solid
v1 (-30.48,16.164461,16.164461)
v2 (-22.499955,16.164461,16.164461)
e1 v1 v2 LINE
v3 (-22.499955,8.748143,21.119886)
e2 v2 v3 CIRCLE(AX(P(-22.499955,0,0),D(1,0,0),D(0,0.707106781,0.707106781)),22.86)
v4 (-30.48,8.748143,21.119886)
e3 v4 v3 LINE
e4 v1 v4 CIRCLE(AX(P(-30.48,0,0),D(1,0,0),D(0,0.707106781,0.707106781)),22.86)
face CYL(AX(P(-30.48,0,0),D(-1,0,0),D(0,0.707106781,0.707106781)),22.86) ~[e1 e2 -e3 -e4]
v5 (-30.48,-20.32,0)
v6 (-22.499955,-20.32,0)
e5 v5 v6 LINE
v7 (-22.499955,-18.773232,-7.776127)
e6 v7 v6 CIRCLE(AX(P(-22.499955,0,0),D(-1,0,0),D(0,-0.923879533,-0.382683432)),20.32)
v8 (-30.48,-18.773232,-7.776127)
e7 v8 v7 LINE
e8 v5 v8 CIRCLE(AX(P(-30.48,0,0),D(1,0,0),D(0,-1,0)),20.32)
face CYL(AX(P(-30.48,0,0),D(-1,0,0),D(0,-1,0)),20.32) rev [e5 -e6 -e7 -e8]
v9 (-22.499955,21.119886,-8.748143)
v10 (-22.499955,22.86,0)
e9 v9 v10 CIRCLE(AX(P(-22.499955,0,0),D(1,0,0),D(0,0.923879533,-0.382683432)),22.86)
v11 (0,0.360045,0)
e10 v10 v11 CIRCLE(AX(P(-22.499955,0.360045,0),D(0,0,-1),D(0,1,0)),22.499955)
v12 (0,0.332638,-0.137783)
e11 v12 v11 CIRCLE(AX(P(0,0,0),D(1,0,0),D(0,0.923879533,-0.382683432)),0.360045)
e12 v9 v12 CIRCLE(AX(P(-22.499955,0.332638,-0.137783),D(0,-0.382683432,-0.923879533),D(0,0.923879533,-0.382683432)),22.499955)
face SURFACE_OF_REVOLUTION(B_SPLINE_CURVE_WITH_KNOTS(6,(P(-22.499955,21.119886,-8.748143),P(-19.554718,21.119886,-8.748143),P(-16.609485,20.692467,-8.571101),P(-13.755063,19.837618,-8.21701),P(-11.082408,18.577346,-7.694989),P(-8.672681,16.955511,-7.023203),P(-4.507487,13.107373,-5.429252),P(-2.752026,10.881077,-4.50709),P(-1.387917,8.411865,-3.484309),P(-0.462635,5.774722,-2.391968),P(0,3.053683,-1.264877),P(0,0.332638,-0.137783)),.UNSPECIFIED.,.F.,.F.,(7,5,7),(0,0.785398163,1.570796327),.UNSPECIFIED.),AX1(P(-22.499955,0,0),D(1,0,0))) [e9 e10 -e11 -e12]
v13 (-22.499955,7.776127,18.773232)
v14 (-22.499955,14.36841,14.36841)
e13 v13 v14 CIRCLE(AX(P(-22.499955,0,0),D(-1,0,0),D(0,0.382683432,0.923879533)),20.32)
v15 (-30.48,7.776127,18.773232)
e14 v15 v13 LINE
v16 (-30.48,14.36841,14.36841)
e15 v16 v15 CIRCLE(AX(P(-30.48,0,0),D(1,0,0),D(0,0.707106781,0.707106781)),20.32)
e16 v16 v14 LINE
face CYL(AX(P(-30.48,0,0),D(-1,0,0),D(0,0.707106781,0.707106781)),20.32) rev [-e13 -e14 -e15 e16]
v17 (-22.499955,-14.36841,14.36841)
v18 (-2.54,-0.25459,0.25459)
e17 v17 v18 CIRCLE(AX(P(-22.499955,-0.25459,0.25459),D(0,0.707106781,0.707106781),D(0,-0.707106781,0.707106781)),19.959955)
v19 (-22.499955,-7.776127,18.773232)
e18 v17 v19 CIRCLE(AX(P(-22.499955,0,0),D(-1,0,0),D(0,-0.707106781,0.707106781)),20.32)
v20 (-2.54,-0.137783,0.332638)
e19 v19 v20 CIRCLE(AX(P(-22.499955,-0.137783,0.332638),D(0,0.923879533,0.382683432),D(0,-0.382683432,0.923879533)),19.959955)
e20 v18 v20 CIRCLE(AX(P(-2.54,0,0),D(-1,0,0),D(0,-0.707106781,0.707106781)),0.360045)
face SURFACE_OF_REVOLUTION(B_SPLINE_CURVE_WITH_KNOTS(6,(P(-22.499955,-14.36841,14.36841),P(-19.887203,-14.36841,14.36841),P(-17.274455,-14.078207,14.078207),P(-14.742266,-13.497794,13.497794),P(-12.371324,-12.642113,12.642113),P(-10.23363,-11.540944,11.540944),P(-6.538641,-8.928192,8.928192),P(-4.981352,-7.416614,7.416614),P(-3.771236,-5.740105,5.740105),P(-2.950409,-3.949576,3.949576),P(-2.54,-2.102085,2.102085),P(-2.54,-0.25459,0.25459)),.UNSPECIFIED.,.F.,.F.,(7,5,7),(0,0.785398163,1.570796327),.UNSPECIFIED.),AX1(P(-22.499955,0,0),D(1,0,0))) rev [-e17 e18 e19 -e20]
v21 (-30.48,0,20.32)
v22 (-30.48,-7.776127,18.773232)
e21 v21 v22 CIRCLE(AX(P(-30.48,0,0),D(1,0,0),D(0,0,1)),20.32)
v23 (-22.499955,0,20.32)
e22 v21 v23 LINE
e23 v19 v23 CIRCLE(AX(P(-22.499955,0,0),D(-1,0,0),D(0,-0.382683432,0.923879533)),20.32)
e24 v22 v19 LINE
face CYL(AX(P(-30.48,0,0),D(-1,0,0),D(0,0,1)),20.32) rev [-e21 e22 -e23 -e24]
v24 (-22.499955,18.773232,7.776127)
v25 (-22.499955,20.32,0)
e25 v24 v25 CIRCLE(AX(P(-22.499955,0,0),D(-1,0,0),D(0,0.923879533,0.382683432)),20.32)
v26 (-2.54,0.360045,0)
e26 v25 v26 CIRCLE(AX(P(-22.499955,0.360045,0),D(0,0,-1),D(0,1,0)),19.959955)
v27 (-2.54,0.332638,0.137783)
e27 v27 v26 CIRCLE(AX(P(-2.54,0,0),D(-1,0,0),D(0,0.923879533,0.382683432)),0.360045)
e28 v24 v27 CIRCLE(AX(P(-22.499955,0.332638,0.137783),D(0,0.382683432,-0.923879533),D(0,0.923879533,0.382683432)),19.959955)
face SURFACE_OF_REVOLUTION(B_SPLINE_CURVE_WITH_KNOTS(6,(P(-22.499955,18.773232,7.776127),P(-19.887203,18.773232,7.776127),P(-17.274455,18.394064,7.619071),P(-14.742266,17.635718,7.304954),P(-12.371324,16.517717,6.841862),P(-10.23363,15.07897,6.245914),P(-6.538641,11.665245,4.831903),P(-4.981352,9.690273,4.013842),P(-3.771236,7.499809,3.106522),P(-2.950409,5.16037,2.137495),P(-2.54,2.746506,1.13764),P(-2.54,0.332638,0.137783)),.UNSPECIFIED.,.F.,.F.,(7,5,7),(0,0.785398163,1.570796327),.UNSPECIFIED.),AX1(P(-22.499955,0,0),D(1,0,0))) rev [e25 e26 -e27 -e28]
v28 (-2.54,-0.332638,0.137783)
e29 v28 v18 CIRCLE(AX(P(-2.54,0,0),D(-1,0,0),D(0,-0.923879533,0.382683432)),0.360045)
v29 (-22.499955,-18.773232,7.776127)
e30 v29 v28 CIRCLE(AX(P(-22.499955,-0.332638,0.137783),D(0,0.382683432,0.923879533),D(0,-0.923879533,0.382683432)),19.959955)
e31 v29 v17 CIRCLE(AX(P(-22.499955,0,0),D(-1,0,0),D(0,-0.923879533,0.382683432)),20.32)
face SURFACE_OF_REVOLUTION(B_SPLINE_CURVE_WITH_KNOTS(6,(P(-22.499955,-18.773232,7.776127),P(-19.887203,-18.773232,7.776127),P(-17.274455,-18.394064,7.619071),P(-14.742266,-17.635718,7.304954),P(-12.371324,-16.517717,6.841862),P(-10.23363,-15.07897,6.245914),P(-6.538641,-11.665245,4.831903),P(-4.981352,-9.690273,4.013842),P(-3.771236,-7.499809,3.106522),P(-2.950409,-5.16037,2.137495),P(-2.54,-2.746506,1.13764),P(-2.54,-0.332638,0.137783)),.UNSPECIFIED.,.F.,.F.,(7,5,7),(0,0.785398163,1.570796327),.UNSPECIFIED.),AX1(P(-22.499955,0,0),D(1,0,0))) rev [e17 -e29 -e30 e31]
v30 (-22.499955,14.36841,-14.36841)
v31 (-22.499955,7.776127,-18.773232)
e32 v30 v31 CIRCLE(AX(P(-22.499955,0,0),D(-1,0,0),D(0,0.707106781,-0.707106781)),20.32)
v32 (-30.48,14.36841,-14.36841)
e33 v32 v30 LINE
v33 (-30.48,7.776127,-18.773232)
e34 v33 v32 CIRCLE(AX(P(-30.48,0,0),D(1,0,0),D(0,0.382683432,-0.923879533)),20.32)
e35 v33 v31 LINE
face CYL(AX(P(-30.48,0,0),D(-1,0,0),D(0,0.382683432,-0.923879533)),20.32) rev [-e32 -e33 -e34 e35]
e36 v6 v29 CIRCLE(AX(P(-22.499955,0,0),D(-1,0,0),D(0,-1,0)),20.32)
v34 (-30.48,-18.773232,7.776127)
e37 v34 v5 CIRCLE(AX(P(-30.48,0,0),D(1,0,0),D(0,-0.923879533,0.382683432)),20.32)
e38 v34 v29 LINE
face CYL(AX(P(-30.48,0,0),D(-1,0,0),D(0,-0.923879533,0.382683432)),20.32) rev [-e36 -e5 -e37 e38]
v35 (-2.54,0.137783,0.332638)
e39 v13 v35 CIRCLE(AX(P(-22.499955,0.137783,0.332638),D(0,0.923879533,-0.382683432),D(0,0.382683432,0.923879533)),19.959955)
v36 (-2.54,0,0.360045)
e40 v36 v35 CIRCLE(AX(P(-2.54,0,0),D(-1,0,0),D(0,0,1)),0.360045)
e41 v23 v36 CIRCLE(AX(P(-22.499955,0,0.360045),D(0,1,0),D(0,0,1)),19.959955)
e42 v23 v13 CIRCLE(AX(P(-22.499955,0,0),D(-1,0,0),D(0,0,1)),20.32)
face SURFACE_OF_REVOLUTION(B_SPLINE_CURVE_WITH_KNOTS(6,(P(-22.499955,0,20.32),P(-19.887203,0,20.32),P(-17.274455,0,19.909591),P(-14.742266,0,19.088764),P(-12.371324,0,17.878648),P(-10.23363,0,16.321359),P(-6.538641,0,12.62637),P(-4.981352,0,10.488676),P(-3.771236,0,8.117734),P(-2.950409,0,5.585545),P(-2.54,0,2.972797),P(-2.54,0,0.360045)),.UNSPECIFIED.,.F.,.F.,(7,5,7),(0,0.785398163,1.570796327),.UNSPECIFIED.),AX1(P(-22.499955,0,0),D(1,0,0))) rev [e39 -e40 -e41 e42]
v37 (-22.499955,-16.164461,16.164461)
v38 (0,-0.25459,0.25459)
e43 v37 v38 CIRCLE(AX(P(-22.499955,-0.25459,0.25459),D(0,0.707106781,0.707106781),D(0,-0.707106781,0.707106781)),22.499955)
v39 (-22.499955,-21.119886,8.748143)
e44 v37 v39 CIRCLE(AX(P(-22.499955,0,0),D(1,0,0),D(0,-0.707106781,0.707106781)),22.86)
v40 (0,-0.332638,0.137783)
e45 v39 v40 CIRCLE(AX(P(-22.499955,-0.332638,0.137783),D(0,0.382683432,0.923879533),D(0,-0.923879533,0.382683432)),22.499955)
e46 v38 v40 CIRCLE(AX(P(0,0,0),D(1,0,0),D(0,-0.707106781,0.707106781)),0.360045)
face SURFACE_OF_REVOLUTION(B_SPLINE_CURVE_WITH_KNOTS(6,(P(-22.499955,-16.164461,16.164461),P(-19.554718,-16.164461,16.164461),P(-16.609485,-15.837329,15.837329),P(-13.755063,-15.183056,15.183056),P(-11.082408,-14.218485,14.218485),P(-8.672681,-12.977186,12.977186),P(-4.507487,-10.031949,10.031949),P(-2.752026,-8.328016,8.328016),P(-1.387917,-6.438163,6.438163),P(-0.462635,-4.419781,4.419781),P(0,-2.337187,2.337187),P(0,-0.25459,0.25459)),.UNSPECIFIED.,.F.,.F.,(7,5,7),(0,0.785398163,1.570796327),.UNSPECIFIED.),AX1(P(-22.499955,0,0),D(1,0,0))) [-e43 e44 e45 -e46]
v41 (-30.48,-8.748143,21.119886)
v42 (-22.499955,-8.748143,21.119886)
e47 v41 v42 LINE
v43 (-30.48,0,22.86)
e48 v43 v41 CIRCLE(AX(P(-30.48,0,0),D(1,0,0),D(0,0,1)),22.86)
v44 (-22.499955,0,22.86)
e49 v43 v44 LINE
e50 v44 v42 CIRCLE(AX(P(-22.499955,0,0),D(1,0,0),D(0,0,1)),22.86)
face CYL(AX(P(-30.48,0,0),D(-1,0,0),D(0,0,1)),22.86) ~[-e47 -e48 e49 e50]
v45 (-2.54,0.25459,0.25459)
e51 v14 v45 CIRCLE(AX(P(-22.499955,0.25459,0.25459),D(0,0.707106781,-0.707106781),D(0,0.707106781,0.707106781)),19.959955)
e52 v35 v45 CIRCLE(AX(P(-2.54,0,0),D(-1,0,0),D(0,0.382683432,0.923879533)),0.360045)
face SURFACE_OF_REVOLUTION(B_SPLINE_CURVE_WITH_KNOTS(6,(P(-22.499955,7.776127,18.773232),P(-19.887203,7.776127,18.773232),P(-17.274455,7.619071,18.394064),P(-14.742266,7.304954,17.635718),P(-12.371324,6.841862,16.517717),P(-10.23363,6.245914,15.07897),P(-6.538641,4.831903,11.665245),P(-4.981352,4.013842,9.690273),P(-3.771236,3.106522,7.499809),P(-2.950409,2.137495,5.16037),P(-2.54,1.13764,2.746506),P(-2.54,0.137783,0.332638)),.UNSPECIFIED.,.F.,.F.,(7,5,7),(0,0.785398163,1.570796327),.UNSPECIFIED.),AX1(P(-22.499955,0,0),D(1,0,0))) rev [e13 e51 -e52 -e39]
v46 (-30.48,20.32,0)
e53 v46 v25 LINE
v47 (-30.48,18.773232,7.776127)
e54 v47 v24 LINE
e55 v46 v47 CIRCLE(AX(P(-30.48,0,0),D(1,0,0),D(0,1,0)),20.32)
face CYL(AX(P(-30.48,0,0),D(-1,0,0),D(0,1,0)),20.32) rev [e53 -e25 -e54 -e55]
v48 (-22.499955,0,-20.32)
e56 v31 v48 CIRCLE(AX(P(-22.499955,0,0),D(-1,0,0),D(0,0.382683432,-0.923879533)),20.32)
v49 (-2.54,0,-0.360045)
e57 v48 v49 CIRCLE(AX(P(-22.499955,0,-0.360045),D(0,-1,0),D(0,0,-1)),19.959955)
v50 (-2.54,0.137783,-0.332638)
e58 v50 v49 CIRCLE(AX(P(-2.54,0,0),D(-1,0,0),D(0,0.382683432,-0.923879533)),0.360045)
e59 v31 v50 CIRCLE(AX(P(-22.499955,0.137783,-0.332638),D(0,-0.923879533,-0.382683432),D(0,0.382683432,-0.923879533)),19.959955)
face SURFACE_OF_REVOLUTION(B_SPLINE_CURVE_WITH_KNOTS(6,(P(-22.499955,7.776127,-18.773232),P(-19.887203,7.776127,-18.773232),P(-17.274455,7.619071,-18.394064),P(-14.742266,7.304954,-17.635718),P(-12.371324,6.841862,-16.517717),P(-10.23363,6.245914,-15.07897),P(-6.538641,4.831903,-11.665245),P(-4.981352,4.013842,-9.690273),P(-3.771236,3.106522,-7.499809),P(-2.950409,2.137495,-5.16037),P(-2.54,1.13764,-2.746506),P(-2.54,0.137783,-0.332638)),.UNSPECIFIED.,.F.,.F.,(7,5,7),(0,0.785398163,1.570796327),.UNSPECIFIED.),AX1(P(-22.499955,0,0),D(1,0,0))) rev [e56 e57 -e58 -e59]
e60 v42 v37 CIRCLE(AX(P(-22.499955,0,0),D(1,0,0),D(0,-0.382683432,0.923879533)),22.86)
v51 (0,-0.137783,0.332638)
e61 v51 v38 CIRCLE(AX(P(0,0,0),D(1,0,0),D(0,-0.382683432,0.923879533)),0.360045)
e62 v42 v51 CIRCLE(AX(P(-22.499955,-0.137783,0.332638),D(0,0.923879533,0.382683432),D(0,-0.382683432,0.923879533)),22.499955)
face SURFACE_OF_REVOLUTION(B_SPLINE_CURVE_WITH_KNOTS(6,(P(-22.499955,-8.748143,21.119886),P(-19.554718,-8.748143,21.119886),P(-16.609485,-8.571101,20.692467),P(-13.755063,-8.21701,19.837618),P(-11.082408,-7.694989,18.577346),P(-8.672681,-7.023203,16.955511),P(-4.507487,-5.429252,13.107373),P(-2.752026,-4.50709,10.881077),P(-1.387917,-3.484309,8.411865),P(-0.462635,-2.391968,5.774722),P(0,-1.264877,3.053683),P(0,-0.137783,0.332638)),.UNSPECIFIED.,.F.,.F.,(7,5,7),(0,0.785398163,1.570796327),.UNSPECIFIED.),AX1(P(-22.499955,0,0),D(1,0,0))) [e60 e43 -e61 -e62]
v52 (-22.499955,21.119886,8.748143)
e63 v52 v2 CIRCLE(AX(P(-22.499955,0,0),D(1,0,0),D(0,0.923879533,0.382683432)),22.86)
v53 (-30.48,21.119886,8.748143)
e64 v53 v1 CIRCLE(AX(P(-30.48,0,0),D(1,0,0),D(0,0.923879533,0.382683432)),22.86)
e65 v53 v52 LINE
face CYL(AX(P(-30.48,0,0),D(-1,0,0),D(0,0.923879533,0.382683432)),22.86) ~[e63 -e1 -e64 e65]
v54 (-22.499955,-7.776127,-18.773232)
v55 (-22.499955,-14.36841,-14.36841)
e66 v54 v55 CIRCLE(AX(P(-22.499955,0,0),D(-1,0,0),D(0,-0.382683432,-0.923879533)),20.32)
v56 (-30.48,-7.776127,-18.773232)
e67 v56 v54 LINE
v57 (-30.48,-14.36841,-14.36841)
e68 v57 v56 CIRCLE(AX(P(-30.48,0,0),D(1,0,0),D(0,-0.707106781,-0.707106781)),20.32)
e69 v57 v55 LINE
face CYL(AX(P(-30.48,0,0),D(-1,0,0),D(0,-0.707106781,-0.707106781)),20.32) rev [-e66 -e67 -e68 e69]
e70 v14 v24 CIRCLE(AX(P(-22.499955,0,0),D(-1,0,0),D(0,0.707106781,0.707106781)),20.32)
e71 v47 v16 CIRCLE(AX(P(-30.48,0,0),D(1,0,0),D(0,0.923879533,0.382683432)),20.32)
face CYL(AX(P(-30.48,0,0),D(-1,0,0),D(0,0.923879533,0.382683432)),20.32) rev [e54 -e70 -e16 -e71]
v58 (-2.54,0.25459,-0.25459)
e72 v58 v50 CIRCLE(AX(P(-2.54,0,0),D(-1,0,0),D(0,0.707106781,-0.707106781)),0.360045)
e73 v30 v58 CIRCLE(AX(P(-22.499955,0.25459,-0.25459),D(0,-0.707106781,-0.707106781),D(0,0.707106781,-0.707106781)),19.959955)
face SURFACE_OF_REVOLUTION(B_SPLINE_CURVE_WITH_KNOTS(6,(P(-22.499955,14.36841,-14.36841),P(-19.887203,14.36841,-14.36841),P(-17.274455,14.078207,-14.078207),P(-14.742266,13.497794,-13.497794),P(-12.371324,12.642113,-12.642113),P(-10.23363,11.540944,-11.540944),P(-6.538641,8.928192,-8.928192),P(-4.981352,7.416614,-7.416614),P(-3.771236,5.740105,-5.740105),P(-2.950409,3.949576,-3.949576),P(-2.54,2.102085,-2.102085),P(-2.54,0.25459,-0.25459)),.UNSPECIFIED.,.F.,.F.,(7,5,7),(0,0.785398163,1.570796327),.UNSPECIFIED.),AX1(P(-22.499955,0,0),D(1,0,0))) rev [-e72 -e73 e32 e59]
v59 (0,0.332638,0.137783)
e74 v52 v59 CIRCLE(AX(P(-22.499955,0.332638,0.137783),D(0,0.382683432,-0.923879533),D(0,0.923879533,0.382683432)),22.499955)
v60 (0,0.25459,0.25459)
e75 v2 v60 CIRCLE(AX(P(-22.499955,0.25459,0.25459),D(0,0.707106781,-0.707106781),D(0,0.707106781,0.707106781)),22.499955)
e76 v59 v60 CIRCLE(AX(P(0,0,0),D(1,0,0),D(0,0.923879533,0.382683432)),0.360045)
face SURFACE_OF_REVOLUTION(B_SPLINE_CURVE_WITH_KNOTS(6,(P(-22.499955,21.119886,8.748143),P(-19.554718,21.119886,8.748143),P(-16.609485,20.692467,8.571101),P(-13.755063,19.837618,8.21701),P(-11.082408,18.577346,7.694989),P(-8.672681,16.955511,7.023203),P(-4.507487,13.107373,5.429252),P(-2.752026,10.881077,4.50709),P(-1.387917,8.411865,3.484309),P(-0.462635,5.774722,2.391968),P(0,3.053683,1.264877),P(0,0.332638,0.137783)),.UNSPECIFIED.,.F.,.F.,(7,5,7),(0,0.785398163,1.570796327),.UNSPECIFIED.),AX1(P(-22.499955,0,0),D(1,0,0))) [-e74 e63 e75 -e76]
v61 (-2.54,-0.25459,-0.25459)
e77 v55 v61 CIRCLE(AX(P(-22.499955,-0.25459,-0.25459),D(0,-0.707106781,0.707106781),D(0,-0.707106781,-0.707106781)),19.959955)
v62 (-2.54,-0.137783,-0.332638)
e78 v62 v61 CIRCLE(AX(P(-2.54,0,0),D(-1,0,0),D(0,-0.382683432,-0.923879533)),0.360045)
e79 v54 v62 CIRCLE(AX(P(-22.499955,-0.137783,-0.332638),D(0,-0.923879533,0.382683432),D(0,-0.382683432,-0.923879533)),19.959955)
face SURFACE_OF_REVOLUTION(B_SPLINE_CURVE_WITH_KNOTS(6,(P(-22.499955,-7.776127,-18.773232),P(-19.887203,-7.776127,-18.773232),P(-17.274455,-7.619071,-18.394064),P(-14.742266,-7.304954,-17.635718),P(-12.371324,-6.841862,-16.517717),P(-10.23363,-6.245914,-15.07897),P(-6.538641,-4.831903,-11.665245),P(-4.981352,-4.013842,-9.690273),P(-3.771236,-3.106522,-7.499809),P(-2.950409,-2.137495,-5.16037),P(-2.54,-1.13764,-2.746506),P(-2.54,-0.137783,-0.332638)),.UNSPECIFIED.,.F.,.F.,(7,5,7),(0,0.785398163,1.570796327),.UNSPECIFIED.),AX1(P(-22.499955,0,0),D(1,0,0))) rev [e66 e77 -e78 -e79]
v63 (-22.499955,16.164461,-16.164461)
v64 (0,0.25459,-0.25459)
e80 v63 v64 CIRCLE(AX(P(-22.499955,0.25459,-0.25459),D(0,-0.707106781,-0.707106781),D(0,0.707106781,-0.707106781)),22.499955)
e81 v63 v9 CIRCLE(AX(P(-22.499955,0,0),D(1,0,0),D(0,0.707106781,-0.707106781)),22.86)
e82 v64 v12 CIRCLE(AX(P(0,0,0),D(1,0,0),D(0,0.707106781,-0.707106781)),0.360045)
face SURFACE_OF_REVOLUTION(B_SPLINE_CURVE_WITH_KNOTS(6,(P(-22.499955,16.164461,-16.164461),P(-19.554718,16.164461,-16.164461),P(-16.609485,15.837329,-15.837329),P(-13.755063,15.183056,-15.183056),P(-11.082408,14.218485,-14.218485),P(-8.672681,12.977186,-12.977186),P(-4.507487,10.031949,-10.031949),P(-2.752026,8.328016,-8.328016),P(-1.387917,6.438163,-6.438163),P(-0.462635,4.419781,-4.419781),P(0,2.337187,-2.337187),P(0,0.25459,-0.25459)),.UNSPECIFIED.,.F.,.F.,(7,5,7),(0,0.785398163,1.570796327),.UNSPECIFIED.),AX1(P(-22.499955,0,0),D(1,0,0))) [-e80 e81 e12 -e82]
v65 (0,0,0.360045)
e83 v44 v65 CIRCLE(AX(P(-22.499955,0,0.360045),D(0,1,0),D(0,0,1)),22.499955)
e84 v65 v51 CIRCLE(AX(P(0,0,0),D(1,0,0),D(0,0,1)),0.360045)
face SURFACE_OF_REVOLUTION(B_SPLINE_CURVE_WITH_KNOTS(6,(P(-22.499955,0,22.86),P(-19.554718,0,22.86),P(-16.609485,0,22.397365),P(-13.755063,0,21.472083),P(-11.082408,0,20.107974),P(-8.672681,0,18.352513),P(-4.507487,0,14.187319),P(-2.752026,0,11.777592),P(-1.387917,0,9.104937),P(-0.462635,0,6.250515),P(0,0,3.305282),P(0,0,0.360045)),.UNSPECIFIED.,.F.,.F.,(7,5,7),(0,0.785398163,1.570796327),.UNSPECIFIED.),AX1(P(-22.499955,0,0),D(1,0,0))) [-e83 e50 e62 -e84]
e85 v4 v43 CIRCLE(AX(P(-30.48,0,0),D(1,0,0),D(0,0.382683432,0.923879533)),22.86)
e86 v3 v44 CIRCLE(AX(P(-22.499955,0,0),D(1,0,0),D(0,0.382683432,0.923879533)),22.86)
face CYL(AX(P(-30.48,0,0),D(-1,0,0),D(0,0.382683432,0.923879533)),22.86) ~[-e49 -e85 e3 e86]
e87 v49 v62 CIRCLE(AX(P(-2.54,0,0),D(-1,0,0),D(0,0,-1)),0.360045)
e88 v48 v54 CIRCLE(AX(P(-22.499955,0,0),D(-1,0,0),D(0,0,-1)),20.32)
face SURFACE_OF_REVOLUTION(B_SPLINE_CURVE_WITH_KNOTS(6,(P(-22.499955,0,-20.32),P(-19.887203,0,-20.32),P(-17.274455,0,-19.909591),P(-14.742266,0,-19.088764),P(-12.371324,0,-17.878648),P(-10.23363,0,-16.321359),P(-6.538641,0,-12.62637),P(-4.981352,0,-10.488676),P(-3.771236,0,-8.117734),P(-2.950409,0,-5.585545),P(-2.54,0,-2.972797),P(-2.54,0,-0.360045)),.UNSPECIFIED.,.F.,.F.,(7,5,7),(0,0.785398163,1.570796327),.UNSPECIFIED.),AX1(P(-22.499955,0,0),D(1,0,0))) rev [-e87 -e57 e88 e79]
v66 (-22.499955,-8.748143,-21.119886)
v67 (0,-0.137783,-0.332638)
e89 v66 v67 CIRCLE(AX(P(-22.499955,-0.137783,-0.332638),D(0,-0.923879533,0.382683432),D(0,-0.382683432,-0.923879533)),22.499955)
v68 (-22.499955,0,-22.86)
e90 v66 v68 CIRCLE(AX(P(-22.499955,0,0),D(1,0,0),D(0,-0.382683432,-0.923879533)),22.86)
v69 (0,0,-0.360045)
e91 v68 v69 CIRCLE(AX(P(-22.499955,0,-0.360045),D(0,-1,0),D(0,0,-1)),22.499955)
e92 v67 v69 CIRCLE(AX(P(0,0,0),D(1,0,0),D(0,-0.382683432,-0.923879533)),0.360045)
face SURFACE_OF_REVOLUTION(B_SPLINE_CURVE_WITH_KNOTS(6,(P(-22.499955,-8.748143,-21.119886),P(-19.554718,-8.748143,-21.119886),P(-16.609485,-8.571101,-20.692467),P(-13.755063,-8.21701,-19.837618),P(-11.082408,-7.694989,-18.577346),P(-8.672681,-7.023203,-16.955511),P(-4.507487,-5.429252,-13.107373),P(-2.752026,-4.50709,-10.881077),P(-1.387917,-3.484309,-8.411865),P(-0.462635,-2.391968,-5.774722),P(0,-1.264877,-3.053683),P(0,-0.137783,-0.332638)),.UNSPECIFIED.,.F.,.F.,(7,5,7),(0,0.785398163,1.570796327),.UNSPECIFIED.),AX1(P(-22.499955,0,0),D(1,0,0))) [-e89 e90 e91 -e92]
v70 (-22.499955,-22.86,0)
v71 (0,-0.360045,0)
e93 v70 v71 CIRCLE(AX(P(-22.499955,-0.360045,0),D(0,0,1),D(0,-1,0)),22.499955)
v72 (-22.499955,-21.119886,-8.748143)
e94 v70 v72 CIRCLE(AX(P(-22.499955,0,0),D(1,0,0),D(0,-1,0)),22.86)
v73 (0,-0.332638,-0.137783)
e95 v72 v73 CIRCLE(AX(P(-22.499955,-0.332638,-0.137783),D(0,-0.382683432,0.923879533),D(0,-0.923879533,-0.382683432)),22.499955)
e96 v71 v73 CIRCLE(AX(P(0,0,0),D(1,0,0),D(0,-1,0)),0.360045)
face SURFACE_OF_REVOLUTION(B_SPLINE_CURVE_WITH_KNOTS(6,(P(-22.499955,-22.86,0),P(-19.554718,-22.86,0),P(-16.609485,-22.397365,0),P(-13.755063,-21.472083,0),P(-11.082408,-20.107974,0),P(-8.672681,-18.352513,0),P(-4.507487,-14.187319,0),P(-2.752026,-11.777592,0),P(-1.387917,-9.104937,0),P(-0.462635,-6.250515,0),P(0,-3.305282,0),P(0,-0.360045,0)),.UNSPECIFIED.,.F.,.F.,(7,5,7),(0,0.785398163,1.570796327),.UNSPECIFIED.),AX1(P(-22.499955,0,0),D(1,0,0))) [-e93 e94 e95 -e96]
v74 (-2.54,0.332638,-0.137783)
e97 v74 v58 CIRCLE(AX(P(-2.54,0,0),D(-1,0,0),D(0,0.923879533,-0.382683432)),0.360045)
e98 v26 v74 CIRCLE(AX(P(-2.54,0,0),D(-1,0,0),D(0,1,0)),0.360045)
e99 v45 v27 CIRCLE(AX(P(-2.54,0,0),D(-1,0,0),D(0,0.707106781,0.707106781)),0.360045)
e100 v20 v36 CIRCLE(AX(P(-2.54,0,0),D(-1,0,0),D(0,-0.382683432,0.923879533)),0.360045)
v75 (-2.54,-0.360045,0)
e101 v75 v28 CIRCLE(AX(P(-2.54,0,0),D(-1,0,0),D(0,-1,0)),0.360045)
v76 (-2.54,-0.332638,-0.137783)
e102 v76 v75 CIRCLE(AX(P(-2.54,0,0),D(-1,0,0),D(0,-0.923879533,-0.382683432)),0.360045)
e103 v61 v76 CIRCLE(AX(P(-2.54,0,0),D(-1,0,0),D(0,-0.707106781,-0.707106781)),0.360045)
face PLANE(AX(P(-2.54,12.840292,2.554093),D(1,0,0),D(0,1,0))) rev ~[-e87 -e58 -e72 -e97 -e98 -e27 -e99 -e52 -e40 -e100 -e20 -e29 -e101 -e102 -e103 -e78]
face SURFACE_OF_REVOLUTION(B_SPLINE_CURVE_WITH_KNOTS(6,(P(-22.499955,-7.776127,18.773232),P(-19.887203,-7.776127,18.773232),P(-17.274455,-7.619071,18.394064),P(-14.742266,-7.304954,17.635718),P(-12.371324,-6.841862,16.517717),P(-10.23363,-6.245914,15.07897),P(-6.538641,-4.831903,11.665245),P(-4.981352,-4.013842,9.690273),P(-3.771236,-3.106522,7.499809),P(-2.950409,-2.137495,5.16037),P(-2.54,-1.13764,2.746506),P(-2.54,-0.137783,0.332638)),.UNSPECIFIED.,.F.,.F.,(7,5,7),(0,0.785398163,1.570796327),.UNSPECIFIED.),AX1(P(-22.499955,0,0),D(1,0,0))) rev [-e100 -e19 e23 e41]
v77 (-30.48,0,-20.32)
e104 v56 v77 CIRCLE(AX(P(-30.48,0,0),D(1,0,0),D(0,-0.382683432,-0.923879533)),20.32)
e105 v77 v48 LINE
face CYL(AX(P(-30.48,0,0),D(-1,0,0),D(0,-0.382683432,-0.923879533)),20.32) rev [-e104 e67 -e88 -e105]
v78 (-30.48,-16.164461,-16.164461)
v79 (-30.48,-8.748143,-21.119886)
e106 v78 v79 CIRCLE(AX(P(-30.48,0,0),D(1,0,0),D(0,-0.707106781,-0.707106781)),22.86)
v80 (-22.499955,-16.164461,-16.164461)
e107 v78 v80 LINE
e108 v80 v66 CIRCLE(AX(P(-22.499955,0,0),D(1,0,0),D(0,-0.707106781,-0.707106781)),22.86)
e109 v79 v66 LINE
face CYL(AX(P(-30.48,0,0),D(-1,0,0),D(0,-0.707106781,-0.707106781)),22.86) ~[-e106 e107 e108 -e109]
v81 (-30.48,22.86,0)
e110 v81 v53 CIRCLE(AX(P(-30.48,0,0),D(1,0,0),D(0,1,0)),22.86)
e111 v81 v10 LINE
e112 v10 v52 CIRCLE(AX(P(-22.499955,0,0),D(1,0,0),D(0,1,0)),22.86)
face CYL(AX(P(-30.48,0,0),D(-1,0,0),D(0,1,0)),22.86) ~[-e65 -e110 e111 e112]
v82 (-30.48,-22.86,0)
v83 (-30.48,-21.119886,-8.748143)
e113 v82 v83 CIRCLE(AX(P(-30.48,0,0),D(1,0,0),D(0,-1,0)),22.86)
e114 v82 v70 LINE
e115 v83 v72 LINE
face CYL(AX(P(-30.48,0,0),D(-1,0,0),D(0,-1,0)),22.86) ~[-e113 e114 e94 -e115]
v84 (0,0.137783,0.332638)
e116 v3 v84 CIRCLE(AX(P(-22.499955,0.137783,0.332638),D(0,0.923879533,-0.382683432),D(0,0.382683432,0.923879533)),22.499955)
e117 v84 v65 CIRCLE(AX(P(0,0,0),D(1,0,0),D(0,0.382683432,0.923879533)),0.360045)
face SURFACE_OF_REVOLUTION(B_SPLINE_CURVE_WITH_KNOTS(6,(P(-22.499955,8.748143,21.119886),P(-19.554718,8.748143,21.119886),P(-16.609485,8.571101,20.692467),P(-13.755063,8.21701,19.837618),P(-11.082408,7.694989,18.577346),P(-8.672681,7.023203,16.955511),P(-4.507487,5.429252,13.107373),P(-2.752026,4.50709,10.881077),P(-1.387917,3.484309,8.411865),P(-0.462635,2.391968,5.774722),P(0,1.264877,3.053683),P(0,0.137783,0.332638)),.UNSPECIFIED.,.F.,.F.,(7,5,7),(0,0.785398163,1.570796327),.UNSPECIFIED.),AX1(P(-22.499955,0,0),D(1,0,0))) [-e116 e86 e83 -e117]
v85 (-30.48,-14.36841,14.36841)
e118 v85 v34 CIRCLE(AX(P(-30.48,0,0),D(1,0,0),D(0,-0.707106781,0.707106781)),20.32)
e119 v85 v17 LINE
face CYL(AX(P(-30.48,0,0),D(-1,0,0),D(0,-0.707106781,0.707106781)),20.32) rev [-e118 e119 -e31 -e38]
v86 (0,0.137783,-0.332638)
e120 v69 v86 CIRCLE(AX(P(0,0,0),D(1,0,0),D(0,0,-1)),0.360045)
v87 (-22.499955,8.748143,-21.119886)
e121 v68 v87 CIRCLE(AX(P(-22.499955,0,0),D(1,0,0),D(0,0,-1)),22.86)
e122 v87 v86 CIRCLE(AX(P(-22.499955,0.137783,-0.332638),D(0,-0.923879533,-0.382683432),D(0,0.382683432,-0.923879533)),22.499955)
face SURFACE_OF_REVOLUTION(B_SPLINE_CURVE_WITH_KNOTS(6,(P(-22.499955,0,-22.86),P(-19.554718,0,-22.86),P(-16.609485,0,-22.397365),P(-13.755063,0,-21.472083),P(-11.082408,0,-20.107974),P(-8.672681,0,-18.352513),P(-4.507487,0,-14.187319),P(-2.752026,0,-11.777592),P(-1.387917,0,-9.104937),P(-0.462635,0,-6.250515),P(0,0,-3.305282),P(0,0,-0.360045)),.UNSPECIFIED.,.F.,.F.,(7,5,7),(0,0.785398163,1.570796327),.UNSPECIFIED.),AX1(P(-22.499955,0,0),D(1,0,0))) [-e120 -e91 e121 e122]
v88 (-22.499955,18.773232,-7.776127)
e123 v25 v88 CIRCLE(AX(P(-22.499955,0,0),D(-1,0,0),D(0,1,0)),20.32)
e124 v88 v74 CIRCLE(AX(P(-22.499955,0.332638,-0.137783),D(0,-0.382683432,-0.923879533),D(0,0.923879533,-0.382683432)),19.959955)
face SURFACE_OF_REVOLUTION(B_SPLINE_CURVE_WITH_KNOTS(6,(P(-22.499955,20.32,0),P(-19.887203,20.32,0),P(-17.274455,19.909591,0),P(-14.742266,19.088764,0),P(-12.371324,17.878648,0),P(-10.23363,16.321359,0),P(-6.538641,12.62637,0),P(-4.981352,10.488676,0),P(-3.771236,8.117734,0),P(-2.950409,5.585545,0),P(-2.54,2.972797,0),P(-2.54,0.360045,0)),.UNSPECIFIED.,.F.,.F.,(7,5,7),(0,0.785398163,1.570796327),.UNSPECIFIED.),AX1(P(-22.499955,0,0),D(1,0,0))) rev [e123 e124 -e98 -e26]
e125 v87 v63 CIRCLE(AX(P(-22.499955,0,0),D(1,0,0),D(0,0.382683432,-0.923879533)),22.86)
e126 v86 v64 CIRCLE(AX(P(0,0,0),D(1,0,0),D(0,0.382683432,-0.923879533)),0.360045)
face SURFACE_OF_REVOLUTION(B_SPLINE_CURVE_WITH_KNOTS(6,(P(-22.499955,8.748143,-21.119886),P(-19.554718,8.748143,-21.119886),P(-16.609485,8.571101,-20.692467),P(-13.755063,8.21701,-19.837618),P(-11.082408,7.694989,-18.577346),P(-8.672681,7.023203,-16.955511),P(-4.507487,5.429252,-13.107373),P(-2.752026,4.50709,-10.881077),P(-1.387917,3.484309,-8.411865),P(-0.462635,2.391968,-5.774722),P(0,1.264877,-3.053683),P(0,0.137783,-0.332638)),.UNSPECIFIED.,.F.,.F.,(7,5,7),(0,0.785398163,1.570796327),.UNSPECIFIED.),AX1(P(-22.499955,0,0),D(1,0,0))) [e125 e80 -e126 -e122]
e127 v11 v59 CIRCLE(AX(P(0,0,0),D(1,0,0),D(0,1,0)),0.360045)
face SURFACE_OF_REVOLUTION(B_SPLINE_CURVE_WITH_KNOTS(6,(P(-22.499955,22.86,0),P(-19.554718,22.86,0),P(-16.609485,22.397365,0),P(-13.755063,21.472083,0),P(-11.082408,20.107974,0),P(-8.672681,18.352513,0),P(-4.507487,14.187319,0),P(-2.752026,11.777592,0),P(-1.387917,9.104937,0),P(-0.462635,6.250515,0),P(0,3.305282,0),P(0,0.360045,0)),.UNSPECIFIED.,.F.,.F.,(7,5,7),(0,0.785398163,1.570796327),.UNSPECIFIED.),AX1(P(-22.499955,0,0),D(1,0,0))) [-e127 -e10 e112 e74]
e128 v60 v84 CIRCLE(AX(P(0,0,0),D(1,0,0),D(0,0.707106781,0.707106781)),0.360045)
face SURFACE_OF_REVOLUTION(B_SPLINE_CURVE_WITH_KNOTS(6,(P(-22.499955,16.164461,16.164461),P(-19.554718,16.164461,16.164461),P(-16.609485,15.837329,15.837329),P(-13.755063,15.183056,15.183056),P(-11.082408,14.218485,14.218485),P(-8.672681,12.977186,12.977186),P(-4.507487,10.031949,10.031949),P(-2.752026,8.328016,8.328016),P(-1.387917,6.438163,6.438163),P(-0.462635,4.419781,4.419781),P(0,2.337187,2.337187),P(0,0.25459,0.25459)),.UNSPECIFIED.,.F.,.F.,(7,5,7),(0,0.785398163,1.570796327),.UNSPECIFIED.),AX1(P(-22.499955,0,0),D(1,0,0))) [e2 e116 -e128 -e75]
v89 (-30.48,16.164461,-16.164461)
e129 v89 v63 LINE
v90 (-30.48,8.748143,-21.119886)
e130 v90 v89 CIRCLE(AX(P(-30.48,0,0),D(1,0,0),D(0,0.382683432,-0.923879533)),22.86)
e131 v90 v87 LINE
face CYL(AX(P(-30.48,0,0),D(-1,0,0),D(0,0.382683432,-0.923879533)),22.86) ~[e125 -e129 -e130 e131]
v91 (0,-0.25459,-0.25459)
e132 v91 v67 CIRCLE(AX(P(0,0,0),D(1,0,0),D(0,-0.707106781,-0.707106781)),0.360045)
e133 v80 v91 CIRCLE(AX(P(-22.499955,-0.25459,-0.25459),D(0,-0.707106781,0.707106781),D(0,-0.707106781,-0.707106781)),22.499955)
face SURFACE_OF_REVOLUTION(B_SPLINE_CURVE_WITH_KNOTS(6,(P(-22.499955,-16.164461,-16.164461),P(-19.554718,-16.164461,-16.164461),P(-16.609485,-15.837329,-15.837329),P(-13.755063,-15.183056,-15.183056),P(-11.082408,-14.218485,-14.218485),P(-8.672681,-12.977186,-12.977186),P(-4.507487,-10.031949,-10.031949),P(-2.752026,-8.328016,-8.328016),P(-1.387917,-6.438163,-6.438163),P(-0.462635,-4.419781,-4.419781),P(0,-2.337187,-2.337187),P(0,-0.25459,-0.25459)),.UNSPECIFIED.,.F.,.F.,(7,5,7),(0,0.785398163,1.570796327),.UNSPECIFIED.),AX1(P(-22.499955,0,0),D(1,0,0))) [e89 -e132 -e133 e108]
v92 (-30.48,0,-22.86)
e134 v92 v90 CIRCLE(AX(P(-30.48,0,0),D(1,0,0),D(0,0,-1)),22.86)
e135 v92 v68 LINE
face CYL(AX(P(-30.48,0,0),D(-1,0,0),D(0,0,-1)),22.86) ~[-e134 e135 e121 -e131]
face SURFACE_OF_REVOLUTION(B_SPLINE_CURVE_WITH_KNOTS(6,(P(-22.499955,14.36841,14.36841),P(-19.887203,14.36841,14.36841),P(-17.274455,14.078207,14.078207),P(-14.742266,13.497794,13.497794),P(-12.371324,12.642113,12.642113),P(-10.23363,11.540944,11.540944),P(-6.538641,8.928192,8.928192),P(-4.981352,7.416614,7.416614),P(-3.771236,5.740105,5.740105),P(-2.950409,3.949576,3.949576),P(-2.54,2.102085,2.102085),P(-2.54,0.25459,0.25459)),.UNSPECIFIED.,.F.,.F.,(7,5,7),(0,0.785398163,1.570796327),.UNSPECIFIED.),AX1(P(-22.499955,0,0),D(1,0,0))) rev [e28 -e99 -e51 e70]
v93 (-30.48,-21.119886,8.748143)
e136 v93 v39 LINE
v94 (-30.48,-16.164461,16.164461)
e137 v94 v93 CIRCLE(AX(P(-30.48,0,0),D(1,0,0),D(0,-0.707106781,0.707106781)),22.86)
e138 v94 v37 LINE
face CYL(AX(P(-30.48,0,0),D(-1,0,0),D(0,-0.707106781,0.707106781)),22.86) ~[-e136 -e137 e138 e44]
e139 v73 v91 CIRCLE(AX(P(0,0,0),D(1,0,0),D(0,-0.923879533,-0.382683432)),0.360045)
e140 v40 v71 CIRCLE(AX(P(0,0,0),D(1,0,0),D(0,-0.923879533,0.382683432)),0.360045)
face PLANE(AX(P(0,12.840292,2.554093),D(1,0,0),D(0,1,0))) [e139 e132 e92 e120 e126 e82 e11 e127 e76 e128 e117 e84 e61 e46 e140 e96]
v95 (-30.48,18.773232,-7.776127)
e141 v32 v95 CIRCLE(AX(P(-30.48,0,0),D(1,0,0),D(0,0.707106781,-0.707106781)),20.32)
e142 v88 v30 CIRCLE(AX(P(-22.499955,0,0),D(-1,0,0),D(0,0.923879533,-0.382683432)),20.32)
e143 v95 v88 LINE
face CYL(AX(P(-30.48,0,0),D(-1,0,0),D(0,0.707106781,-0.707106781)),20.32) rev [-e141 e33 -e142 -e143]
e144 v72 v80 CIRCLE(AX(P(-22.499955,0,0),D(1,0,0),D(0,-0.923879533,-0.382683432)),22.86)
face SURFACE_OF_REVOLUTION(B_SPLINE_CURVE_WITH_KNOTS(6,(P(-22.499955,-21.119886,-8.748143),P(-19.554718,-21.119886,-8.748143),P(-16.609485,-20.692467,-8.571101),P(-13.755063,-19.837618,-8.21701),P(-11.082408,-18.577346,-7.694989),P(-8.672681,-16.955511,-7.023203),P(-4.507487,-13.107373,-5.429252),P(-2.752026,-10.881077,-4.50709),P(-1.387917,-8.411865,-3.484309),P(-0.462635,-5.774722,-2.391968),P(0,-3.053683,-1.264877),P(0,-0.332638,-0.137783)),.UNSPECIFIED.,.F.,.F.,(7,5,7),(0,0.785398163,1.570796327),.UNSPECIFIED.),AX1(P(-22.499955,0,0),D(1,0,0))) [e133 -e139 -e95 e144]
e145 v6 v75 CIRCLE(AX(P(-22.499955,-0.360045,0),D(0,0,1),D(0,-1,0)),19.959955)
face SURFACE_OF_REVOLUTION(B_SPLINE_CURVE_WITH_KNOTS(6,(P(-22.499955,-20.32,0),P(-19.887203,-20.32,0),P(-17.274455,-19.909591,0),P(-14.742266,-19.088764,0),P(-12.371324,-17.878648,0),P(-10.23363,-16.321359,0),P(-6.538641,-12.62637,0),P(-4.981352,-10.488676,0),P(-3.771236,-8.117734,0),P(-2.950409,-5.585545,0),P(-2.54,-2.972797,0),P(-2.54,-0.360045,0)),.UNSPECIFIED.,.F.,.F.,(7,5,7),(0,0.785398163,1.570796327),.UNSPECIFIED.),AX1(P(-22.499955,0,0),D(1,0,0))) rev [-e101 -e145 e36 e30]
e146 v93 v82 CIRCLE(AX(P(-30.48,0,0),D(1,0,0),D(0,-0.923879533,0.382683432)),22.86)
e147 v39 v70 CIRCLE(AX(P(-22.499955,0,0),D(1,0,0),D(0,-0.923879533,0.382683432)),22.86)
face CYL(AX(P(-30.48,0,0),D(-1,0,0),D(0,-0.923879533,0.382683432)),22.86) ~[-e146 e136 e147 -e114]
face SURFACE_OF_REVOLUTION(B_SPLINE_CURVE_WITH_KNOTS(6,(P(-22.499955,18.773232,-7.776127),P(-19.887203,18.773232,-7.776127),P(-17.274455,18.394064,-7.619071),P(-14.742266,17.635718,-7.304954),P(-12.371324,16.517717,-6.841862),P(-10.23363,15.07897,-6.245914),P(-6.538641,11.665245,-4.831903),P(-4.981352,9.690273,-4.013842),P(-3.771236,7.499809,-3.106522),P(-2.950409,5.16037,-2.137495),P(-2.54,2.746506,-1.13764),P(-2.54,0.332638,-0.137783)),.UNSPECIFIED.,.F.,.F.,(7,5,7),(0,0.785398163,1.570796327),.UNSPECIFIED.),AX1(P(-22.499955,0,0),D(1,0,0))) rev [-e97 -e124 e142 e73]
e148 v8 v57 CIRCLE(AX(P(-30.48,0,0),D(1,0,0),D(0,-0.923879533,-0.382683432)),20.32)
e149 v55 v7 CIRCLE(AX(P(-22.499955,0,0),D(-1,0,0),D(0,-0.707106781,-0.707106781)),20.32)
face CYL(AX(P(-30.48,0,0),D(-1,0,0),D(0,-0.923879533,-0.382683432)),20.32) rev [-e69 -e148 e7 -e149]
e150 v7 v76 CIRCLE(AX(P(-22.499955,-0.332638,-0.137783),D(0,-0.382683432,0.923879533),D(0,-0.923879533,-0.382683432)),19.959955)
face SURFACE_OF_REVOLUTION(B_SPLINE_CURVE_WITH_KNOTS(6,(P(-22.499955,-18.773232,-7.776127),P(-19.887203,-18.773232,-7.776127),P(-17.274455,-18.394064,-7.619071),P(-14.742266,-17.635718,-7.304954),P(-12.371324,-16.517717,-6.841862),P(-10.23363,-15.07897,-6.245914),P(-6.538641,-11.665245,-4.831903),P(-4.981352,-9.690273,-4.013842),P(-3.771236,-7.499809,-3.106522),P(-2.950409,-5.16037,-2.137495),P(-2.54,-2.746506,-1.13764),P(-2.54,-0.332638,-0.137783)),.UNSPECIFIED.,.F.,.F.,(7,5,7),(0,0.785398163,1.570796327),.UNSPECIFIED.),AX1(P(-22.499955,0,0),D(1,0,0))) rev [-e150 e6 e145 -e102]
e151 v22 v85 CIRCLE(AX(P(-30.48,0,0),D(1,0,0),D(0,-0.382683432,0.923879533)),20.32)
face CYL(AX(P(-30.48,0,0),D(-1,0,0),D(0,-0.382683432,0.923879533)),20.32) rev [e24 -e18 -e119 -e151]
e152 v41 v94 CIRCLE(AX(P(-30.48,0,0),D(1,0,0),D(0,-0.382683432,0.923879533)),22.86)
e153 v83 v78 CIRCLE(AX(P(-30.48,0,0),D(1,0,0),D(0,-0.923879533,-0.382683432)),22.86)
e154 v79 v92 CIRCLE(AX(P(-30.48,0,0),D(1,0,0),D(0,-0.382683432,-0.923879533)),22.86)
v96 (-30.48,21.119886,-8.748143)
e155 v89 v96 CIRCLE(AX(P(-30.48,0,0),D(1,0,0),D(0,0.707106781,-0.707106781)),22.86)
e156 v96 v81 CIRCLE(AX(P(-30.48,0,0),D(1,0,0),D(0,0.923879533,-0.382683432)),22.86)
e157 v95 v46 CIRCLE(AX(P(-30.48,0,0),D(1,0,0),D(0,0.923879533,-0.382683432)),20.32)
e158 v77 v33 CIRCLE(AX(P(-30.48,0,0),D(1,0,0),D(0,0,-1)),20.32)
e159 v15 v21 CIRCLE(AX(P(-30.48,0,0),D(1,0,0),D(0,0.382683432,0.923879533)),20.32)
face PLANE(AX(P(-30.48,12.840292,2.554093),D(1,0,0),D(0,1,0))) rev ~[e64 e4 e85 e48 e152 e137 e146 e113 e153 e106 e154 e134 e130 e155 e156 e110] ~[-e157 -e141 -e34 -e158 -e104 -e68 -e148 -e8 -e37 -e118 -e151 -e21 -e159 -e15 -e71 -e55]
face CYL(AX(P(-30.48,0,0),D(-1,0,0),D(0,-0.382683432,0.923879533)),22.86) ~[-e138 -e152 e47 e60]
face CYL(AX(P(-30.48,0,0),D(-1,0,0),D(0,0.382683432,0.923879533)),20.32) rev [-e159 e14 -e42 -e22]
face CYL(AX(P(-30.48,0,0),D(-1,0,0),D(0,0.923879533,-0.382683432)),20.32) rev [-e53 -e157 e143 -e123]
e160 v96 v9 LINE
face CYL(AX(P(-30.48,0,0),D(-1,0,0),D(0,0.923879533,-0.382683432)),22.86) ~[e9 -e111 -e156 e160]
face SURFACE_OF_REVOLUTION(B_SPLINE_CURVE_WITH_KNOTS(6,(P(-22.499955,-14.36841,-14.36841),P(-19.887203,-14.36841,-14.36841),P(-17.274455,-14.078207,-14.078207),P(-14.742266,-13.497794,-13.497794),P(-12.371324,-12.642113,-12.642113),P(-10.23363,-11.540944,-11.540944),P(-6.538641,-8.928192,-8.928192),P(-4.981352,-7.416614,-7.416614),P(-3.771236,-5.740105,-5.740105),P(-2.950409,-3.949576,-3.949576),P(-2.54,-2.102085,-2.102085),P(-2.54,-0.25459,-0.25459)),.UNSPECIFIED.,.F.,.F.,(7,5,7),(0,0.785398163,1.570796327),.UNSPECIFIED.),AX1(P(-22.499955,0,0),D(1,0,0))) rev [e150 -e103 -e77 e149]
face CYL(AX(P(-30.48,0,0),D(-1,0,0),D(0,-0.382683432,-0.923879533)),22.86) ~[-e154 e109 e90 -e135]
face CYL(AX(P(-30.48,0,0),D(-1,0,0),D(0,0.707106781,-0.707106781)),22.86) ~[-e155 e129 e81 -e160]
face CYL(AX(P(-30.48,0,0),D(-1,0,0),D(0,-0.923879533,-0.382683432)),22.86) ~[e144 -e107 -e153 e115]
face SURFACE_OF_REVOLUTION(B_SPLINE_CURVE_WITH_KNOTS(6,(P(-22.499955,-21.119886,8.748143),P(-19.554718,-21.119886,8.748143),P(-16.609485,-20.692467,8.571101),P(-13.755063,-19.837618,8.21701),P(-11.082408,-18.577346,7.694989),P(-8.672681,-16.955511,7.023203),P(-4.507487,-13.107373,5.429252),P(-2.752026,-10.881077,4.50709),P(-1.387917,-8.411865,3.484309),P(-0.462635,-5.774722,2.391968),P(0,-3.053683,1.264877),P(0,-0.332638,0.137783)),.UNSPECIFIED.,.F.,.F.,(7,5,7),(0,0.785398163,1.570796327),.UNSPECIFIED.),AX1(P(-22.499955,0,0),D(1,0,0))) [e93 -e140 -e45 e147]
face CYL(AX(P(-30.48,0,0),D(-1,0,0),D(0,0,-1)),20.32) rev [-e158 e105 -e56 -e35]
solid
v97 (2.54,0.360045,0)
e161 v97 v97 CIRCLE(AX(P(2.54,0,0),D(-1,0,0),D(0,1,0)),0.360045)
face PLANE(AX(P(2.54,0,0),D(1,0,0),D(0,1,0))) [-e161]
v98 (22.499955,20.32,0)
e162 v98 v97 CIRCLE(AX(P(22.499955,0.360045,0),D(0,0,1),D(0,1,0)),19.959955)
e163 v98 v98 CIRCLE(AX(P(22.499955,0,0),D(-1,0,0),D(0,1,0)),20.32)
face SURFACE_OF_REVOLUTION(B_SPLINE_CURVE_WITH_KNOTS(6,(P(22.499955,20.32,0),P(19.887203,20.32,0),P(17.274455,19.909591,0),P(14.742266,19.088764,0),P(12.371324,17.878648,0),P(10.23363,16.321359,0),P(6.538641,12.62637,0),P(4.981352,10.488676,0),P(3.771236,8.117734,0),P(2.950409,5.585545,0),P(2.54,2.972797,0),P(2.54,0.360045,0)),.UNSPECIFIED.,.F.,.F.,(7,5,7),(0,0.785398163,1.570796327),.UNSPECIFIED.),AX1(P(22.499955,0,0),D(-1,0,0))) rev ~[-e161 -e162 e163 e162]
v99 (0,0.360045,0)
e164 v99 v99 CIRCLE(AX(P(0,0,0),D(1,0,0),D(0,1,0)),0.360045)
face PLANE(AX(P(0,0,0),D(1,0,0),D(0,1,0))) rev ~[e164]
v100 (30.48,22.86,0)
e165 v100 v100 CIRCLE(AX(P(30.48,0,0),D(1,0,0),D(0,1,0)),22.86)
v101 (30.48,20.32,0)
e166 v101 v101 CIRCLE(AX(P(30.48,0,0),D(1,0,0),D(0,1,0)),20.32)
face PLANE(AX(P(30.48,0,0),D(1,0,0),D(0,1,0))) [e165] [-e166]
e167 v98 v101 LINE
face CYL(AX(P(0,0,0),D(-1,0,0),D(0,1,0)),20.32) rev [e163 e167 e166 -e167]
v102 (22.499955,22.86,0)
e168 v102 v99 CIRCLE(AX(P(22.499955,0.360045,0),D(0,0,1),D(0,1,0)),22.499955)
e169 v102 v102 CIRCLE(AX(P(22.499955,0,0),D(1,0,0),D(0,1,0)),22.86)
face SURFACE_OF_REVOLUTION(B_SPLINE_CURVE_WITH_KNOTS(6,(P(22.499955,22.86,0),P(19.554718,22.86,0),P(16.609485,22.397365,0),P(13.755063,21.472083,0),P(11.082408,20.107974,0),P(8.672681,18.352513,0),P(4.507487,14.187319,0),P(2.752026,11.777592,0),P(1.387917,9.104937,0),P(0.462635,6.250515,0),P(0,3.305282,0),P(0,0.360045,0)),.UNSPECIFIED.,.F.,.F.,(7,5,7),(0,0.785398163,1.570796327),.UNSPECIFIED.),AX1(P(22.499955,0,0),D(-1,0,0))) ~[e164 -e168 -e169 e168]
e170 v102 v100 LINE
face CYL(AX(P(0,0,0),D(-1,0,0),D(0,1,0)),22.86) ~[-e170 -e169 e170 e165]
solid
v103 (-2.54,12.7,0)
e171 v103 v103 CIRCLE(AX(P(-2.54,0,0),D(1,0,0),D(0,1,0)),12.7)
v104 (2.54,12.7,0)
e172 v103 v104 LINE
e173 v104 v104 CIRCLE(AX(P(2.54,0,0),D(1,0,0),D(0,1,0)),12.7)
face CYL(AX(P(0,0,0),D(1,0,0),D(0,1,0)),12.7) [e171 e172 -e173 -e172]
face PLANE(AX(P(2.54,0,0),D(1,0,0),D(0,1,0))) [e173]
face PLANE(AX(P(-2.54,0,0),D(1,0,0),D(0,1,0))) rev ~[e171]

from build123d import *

# Parameters (mm, degrees)
F0_R      = 22.86
F1_DEPTH  = 30.48
F2_T      = -2.54
F3_R      = 19.959955
F4_R      = 22.499955
F7_DEPTH  = 30.48
F8_T      = -2.54
F9_R      = 19.959955
F10_R     = 22.499955
F11_R     = 12.7
F12_DEPTH = 2.54


with BuildPart() as f1:
    # F0 (on Right) → F1 (new body)
    with BuildSketch(Plane.YZ):
        Circle(F0_R)
    extrude(amount=F1_DEPTH)

    # F2
    f2_openings = [f1.faces().sort_by_distance(p)[0] for p in [
        (30.48, 0, 0),
    ]]
    offset(amount=F2_T, openings=f2_openings)

    # F3
    f3_edges = [f1.edges().sort_by_distance(p)[0] for p in [
        (2.54, -20.32, 0),
    ]]
    fillet(f3_edges, radius=F3_R)

    # F4
    f4_edges = [f1.edges().sort_by_distance(p)[0] for p in [
        (0, -22.86, 0),
    ]]
    fillet(f4_edges, radius=F4_R)


with BuildPart() as f7:
    # F6 (on offset) → F7 (new body)
    with BuildSketch(Plane.YZ.offset(-30.48)):
        with BuildLine():
            Line((0, 0), (22.86, 0))
            ThreePointArc((22.86, 0), (22.42075151, 4.4597647613), (21.1198861132, 8.7481432639))
            Line((21.1198861132, 8.7481432639), (0, 0))
        make_face()
        with BuildLine():
            Line((0, 0), (21.1198861132, 8.7481432639))
            ThreePointArc((21.1198861132, 8.7481432639), (19.0073953372, 12.7003355268), (16.1644610179, 16.1644610179))
            Line((16.1644610179, 16.1644610179), (0, 0))
        make_face()
        with BuildLine():
            Line((8.7481432639, 21.1198861132), (0, 0))
            Line((0, 0), (16.1644610179, 16.1644610179))
            ThreePointArc((16.1644610179, 16.1644610179), (12.7003355268, 19.0073953372), (8.7481432639, 21.1198861132))
        make_face()
        with BuildLine():
            Line((0, 22.86), (0, 0))
            Line((0, 0), (8.7481432639, 21.1198861132))
            ThreePointArc((8.7481432639, 21.1198861132), (4.4597647613, 22.42075151), (0, 22.86))
        make_face()
        with BuildLine():
            Line((-8.7481432639, 21.1198861132), (0, 0))
            Line((0, 0), (0, 22.86))
            ThreePointArc((0, 22.86), (-4.4597647613, 22.42075151), (-8.7481432639, 21.1198861132))
        make_face()
        with BuildLine():
            Line((-16.1644610179, 16.1644610179), (0, 0))
            Line((0, 0), (-8.7481432639, 21.1198861132))
            ThreePointArc((-8.7481432639, 21.1198861132), (-12.7003355268, 19.0073953372), (-16.1644610179, 16.1644610179))
        make_face()
        with BuildLine():
            Line((-21.1198861132, 8.7481432639), (0, 0))
            Line((0, 0), (-16.1644610179, 16.1644610179))
            ThreePointArc((-16.1644610179, 16.1644610179), (-19.0073953372, 12.7003355268), (-21.1198861132, 8.7481432639))
        make_face()
        with BuildLine():
            Line((-22.86, 0), (0, 0))
            Line((0, 0), (-21.1198861132, 8.7481432639))
            ThreePointArc((-21.1198861132, 8.7481432639), (-22.42075151, 4.4597647613), (-22.86, 0))
        make_face()
        with BuildLine():
            Line((-21.1198861132, -8.7481432639), (0, 0))
            Line((0, 0), (-22.86, 0))
            ThreePointArc((-22.86, 0), (-22.42075151, -4.4597647613), (-21.1198861132, -8.7481432639))
        make_face()
        with BuildLine():
            Line((-16.1644610179, -16.1644610179), (0, 0))
            Line((0, 0), (-21.1198861132, -8.7481432639))
            ThreePointArc((-21.1198861132, -8.7481432639), (-19.0073953372, -12.7003355268), (-16.1644610179, -16.1644610179))
        make_face()
        with BuildLine():
            Line((-8.7481432639, -21.1198861132), (0, 0))
            Line((0, 0), (-16.1644610179, -16.1644610179))
            ThreePointArc((-16.1644610179, -16.1644610179), (-12.7003355268, -19.0073953372), (-8.7481432639, -21.1198861132))
        make_face()
        with BuildLine():
            Line((0, -22.86), (0, 0))
            Line((0, 0), (-8.7481432639, -21.1198861132))
            ThreePointArc((-8.7481432639, -21.1198861132), (-4.4597647613, -22.42075151), (0, -22.86))
        make_face()
        with BuildLine():
            Line((8.7481432639, -21.1198861132), (0, 0))
            Line((0, 0), (0, -22.86))
            ThreePointArc((0, -22.86), (4.4597647613, -22.42075151), (8.7481432639, -21.1198861132))
        make_face()
        with BuildLine():
            Line((16.1644610179, -16.1644610179), (0, 0))
            Line((0, 0), (8.7481432639, -21.1198861132))
            ThreePointArc((8.7481432639, -21.1198861132), (12.7003355268, -19.0073953372), (16.1644610179, -16.1644610179))
        make_face()
        with BuildLine():
            ThreePointArc((16.1644610179, -16.1644610179), (19.0073953372, -12.7003355268), (21.1198861132, -8.7481432639))
            Line((21.1198861132, -8.7481432639), (0, 0))
            Line((0, 0), (16.1644610179, -16.1644610179))
        make_face()
        with BuildLine():
            ThreePointArc((21.1198861132, -8.7481432639), (22.42075151, -4.4597647613), (22.86, 0))
            Line((22.86, 0), (0, 0))
            Line((0, 0), (21.1198861132, -8.7481432639))
        make_face()
    extrude(amount=F7_DEPTH)

    # F8
    f8_openings = [f7.faces().sort_by_distance(p)[0] for p in [
        (-30.48, 0, 0),
    ]]
    offset(amount=F8_T, openings=f8_openings)

    # F9
    f9_edges = [f7.edges().sort_by_distance(p)[0] for p in [
        (-2.54, -18.773232, 7.776127),
    ]]
    fillet(f9_edges, radius=F9_R)

    # F10
    f10_edges = [f7.edges().sort_by_distance(p)[0] for p in [
        (0, -21.119886, 8.748143),
    ]]
    fillet(f10_edges, radius=F10_R)


with BuildPart() as f12:
    # F11 (on Right) → F12 (new body, symmetric)
    with BuildSketch(Plane.YZ):
        Circle(F11_R)
    extrude(amount=F12_DEPTH, both=True)


solid = Compound([f1.part, f7.part, f12.part])
